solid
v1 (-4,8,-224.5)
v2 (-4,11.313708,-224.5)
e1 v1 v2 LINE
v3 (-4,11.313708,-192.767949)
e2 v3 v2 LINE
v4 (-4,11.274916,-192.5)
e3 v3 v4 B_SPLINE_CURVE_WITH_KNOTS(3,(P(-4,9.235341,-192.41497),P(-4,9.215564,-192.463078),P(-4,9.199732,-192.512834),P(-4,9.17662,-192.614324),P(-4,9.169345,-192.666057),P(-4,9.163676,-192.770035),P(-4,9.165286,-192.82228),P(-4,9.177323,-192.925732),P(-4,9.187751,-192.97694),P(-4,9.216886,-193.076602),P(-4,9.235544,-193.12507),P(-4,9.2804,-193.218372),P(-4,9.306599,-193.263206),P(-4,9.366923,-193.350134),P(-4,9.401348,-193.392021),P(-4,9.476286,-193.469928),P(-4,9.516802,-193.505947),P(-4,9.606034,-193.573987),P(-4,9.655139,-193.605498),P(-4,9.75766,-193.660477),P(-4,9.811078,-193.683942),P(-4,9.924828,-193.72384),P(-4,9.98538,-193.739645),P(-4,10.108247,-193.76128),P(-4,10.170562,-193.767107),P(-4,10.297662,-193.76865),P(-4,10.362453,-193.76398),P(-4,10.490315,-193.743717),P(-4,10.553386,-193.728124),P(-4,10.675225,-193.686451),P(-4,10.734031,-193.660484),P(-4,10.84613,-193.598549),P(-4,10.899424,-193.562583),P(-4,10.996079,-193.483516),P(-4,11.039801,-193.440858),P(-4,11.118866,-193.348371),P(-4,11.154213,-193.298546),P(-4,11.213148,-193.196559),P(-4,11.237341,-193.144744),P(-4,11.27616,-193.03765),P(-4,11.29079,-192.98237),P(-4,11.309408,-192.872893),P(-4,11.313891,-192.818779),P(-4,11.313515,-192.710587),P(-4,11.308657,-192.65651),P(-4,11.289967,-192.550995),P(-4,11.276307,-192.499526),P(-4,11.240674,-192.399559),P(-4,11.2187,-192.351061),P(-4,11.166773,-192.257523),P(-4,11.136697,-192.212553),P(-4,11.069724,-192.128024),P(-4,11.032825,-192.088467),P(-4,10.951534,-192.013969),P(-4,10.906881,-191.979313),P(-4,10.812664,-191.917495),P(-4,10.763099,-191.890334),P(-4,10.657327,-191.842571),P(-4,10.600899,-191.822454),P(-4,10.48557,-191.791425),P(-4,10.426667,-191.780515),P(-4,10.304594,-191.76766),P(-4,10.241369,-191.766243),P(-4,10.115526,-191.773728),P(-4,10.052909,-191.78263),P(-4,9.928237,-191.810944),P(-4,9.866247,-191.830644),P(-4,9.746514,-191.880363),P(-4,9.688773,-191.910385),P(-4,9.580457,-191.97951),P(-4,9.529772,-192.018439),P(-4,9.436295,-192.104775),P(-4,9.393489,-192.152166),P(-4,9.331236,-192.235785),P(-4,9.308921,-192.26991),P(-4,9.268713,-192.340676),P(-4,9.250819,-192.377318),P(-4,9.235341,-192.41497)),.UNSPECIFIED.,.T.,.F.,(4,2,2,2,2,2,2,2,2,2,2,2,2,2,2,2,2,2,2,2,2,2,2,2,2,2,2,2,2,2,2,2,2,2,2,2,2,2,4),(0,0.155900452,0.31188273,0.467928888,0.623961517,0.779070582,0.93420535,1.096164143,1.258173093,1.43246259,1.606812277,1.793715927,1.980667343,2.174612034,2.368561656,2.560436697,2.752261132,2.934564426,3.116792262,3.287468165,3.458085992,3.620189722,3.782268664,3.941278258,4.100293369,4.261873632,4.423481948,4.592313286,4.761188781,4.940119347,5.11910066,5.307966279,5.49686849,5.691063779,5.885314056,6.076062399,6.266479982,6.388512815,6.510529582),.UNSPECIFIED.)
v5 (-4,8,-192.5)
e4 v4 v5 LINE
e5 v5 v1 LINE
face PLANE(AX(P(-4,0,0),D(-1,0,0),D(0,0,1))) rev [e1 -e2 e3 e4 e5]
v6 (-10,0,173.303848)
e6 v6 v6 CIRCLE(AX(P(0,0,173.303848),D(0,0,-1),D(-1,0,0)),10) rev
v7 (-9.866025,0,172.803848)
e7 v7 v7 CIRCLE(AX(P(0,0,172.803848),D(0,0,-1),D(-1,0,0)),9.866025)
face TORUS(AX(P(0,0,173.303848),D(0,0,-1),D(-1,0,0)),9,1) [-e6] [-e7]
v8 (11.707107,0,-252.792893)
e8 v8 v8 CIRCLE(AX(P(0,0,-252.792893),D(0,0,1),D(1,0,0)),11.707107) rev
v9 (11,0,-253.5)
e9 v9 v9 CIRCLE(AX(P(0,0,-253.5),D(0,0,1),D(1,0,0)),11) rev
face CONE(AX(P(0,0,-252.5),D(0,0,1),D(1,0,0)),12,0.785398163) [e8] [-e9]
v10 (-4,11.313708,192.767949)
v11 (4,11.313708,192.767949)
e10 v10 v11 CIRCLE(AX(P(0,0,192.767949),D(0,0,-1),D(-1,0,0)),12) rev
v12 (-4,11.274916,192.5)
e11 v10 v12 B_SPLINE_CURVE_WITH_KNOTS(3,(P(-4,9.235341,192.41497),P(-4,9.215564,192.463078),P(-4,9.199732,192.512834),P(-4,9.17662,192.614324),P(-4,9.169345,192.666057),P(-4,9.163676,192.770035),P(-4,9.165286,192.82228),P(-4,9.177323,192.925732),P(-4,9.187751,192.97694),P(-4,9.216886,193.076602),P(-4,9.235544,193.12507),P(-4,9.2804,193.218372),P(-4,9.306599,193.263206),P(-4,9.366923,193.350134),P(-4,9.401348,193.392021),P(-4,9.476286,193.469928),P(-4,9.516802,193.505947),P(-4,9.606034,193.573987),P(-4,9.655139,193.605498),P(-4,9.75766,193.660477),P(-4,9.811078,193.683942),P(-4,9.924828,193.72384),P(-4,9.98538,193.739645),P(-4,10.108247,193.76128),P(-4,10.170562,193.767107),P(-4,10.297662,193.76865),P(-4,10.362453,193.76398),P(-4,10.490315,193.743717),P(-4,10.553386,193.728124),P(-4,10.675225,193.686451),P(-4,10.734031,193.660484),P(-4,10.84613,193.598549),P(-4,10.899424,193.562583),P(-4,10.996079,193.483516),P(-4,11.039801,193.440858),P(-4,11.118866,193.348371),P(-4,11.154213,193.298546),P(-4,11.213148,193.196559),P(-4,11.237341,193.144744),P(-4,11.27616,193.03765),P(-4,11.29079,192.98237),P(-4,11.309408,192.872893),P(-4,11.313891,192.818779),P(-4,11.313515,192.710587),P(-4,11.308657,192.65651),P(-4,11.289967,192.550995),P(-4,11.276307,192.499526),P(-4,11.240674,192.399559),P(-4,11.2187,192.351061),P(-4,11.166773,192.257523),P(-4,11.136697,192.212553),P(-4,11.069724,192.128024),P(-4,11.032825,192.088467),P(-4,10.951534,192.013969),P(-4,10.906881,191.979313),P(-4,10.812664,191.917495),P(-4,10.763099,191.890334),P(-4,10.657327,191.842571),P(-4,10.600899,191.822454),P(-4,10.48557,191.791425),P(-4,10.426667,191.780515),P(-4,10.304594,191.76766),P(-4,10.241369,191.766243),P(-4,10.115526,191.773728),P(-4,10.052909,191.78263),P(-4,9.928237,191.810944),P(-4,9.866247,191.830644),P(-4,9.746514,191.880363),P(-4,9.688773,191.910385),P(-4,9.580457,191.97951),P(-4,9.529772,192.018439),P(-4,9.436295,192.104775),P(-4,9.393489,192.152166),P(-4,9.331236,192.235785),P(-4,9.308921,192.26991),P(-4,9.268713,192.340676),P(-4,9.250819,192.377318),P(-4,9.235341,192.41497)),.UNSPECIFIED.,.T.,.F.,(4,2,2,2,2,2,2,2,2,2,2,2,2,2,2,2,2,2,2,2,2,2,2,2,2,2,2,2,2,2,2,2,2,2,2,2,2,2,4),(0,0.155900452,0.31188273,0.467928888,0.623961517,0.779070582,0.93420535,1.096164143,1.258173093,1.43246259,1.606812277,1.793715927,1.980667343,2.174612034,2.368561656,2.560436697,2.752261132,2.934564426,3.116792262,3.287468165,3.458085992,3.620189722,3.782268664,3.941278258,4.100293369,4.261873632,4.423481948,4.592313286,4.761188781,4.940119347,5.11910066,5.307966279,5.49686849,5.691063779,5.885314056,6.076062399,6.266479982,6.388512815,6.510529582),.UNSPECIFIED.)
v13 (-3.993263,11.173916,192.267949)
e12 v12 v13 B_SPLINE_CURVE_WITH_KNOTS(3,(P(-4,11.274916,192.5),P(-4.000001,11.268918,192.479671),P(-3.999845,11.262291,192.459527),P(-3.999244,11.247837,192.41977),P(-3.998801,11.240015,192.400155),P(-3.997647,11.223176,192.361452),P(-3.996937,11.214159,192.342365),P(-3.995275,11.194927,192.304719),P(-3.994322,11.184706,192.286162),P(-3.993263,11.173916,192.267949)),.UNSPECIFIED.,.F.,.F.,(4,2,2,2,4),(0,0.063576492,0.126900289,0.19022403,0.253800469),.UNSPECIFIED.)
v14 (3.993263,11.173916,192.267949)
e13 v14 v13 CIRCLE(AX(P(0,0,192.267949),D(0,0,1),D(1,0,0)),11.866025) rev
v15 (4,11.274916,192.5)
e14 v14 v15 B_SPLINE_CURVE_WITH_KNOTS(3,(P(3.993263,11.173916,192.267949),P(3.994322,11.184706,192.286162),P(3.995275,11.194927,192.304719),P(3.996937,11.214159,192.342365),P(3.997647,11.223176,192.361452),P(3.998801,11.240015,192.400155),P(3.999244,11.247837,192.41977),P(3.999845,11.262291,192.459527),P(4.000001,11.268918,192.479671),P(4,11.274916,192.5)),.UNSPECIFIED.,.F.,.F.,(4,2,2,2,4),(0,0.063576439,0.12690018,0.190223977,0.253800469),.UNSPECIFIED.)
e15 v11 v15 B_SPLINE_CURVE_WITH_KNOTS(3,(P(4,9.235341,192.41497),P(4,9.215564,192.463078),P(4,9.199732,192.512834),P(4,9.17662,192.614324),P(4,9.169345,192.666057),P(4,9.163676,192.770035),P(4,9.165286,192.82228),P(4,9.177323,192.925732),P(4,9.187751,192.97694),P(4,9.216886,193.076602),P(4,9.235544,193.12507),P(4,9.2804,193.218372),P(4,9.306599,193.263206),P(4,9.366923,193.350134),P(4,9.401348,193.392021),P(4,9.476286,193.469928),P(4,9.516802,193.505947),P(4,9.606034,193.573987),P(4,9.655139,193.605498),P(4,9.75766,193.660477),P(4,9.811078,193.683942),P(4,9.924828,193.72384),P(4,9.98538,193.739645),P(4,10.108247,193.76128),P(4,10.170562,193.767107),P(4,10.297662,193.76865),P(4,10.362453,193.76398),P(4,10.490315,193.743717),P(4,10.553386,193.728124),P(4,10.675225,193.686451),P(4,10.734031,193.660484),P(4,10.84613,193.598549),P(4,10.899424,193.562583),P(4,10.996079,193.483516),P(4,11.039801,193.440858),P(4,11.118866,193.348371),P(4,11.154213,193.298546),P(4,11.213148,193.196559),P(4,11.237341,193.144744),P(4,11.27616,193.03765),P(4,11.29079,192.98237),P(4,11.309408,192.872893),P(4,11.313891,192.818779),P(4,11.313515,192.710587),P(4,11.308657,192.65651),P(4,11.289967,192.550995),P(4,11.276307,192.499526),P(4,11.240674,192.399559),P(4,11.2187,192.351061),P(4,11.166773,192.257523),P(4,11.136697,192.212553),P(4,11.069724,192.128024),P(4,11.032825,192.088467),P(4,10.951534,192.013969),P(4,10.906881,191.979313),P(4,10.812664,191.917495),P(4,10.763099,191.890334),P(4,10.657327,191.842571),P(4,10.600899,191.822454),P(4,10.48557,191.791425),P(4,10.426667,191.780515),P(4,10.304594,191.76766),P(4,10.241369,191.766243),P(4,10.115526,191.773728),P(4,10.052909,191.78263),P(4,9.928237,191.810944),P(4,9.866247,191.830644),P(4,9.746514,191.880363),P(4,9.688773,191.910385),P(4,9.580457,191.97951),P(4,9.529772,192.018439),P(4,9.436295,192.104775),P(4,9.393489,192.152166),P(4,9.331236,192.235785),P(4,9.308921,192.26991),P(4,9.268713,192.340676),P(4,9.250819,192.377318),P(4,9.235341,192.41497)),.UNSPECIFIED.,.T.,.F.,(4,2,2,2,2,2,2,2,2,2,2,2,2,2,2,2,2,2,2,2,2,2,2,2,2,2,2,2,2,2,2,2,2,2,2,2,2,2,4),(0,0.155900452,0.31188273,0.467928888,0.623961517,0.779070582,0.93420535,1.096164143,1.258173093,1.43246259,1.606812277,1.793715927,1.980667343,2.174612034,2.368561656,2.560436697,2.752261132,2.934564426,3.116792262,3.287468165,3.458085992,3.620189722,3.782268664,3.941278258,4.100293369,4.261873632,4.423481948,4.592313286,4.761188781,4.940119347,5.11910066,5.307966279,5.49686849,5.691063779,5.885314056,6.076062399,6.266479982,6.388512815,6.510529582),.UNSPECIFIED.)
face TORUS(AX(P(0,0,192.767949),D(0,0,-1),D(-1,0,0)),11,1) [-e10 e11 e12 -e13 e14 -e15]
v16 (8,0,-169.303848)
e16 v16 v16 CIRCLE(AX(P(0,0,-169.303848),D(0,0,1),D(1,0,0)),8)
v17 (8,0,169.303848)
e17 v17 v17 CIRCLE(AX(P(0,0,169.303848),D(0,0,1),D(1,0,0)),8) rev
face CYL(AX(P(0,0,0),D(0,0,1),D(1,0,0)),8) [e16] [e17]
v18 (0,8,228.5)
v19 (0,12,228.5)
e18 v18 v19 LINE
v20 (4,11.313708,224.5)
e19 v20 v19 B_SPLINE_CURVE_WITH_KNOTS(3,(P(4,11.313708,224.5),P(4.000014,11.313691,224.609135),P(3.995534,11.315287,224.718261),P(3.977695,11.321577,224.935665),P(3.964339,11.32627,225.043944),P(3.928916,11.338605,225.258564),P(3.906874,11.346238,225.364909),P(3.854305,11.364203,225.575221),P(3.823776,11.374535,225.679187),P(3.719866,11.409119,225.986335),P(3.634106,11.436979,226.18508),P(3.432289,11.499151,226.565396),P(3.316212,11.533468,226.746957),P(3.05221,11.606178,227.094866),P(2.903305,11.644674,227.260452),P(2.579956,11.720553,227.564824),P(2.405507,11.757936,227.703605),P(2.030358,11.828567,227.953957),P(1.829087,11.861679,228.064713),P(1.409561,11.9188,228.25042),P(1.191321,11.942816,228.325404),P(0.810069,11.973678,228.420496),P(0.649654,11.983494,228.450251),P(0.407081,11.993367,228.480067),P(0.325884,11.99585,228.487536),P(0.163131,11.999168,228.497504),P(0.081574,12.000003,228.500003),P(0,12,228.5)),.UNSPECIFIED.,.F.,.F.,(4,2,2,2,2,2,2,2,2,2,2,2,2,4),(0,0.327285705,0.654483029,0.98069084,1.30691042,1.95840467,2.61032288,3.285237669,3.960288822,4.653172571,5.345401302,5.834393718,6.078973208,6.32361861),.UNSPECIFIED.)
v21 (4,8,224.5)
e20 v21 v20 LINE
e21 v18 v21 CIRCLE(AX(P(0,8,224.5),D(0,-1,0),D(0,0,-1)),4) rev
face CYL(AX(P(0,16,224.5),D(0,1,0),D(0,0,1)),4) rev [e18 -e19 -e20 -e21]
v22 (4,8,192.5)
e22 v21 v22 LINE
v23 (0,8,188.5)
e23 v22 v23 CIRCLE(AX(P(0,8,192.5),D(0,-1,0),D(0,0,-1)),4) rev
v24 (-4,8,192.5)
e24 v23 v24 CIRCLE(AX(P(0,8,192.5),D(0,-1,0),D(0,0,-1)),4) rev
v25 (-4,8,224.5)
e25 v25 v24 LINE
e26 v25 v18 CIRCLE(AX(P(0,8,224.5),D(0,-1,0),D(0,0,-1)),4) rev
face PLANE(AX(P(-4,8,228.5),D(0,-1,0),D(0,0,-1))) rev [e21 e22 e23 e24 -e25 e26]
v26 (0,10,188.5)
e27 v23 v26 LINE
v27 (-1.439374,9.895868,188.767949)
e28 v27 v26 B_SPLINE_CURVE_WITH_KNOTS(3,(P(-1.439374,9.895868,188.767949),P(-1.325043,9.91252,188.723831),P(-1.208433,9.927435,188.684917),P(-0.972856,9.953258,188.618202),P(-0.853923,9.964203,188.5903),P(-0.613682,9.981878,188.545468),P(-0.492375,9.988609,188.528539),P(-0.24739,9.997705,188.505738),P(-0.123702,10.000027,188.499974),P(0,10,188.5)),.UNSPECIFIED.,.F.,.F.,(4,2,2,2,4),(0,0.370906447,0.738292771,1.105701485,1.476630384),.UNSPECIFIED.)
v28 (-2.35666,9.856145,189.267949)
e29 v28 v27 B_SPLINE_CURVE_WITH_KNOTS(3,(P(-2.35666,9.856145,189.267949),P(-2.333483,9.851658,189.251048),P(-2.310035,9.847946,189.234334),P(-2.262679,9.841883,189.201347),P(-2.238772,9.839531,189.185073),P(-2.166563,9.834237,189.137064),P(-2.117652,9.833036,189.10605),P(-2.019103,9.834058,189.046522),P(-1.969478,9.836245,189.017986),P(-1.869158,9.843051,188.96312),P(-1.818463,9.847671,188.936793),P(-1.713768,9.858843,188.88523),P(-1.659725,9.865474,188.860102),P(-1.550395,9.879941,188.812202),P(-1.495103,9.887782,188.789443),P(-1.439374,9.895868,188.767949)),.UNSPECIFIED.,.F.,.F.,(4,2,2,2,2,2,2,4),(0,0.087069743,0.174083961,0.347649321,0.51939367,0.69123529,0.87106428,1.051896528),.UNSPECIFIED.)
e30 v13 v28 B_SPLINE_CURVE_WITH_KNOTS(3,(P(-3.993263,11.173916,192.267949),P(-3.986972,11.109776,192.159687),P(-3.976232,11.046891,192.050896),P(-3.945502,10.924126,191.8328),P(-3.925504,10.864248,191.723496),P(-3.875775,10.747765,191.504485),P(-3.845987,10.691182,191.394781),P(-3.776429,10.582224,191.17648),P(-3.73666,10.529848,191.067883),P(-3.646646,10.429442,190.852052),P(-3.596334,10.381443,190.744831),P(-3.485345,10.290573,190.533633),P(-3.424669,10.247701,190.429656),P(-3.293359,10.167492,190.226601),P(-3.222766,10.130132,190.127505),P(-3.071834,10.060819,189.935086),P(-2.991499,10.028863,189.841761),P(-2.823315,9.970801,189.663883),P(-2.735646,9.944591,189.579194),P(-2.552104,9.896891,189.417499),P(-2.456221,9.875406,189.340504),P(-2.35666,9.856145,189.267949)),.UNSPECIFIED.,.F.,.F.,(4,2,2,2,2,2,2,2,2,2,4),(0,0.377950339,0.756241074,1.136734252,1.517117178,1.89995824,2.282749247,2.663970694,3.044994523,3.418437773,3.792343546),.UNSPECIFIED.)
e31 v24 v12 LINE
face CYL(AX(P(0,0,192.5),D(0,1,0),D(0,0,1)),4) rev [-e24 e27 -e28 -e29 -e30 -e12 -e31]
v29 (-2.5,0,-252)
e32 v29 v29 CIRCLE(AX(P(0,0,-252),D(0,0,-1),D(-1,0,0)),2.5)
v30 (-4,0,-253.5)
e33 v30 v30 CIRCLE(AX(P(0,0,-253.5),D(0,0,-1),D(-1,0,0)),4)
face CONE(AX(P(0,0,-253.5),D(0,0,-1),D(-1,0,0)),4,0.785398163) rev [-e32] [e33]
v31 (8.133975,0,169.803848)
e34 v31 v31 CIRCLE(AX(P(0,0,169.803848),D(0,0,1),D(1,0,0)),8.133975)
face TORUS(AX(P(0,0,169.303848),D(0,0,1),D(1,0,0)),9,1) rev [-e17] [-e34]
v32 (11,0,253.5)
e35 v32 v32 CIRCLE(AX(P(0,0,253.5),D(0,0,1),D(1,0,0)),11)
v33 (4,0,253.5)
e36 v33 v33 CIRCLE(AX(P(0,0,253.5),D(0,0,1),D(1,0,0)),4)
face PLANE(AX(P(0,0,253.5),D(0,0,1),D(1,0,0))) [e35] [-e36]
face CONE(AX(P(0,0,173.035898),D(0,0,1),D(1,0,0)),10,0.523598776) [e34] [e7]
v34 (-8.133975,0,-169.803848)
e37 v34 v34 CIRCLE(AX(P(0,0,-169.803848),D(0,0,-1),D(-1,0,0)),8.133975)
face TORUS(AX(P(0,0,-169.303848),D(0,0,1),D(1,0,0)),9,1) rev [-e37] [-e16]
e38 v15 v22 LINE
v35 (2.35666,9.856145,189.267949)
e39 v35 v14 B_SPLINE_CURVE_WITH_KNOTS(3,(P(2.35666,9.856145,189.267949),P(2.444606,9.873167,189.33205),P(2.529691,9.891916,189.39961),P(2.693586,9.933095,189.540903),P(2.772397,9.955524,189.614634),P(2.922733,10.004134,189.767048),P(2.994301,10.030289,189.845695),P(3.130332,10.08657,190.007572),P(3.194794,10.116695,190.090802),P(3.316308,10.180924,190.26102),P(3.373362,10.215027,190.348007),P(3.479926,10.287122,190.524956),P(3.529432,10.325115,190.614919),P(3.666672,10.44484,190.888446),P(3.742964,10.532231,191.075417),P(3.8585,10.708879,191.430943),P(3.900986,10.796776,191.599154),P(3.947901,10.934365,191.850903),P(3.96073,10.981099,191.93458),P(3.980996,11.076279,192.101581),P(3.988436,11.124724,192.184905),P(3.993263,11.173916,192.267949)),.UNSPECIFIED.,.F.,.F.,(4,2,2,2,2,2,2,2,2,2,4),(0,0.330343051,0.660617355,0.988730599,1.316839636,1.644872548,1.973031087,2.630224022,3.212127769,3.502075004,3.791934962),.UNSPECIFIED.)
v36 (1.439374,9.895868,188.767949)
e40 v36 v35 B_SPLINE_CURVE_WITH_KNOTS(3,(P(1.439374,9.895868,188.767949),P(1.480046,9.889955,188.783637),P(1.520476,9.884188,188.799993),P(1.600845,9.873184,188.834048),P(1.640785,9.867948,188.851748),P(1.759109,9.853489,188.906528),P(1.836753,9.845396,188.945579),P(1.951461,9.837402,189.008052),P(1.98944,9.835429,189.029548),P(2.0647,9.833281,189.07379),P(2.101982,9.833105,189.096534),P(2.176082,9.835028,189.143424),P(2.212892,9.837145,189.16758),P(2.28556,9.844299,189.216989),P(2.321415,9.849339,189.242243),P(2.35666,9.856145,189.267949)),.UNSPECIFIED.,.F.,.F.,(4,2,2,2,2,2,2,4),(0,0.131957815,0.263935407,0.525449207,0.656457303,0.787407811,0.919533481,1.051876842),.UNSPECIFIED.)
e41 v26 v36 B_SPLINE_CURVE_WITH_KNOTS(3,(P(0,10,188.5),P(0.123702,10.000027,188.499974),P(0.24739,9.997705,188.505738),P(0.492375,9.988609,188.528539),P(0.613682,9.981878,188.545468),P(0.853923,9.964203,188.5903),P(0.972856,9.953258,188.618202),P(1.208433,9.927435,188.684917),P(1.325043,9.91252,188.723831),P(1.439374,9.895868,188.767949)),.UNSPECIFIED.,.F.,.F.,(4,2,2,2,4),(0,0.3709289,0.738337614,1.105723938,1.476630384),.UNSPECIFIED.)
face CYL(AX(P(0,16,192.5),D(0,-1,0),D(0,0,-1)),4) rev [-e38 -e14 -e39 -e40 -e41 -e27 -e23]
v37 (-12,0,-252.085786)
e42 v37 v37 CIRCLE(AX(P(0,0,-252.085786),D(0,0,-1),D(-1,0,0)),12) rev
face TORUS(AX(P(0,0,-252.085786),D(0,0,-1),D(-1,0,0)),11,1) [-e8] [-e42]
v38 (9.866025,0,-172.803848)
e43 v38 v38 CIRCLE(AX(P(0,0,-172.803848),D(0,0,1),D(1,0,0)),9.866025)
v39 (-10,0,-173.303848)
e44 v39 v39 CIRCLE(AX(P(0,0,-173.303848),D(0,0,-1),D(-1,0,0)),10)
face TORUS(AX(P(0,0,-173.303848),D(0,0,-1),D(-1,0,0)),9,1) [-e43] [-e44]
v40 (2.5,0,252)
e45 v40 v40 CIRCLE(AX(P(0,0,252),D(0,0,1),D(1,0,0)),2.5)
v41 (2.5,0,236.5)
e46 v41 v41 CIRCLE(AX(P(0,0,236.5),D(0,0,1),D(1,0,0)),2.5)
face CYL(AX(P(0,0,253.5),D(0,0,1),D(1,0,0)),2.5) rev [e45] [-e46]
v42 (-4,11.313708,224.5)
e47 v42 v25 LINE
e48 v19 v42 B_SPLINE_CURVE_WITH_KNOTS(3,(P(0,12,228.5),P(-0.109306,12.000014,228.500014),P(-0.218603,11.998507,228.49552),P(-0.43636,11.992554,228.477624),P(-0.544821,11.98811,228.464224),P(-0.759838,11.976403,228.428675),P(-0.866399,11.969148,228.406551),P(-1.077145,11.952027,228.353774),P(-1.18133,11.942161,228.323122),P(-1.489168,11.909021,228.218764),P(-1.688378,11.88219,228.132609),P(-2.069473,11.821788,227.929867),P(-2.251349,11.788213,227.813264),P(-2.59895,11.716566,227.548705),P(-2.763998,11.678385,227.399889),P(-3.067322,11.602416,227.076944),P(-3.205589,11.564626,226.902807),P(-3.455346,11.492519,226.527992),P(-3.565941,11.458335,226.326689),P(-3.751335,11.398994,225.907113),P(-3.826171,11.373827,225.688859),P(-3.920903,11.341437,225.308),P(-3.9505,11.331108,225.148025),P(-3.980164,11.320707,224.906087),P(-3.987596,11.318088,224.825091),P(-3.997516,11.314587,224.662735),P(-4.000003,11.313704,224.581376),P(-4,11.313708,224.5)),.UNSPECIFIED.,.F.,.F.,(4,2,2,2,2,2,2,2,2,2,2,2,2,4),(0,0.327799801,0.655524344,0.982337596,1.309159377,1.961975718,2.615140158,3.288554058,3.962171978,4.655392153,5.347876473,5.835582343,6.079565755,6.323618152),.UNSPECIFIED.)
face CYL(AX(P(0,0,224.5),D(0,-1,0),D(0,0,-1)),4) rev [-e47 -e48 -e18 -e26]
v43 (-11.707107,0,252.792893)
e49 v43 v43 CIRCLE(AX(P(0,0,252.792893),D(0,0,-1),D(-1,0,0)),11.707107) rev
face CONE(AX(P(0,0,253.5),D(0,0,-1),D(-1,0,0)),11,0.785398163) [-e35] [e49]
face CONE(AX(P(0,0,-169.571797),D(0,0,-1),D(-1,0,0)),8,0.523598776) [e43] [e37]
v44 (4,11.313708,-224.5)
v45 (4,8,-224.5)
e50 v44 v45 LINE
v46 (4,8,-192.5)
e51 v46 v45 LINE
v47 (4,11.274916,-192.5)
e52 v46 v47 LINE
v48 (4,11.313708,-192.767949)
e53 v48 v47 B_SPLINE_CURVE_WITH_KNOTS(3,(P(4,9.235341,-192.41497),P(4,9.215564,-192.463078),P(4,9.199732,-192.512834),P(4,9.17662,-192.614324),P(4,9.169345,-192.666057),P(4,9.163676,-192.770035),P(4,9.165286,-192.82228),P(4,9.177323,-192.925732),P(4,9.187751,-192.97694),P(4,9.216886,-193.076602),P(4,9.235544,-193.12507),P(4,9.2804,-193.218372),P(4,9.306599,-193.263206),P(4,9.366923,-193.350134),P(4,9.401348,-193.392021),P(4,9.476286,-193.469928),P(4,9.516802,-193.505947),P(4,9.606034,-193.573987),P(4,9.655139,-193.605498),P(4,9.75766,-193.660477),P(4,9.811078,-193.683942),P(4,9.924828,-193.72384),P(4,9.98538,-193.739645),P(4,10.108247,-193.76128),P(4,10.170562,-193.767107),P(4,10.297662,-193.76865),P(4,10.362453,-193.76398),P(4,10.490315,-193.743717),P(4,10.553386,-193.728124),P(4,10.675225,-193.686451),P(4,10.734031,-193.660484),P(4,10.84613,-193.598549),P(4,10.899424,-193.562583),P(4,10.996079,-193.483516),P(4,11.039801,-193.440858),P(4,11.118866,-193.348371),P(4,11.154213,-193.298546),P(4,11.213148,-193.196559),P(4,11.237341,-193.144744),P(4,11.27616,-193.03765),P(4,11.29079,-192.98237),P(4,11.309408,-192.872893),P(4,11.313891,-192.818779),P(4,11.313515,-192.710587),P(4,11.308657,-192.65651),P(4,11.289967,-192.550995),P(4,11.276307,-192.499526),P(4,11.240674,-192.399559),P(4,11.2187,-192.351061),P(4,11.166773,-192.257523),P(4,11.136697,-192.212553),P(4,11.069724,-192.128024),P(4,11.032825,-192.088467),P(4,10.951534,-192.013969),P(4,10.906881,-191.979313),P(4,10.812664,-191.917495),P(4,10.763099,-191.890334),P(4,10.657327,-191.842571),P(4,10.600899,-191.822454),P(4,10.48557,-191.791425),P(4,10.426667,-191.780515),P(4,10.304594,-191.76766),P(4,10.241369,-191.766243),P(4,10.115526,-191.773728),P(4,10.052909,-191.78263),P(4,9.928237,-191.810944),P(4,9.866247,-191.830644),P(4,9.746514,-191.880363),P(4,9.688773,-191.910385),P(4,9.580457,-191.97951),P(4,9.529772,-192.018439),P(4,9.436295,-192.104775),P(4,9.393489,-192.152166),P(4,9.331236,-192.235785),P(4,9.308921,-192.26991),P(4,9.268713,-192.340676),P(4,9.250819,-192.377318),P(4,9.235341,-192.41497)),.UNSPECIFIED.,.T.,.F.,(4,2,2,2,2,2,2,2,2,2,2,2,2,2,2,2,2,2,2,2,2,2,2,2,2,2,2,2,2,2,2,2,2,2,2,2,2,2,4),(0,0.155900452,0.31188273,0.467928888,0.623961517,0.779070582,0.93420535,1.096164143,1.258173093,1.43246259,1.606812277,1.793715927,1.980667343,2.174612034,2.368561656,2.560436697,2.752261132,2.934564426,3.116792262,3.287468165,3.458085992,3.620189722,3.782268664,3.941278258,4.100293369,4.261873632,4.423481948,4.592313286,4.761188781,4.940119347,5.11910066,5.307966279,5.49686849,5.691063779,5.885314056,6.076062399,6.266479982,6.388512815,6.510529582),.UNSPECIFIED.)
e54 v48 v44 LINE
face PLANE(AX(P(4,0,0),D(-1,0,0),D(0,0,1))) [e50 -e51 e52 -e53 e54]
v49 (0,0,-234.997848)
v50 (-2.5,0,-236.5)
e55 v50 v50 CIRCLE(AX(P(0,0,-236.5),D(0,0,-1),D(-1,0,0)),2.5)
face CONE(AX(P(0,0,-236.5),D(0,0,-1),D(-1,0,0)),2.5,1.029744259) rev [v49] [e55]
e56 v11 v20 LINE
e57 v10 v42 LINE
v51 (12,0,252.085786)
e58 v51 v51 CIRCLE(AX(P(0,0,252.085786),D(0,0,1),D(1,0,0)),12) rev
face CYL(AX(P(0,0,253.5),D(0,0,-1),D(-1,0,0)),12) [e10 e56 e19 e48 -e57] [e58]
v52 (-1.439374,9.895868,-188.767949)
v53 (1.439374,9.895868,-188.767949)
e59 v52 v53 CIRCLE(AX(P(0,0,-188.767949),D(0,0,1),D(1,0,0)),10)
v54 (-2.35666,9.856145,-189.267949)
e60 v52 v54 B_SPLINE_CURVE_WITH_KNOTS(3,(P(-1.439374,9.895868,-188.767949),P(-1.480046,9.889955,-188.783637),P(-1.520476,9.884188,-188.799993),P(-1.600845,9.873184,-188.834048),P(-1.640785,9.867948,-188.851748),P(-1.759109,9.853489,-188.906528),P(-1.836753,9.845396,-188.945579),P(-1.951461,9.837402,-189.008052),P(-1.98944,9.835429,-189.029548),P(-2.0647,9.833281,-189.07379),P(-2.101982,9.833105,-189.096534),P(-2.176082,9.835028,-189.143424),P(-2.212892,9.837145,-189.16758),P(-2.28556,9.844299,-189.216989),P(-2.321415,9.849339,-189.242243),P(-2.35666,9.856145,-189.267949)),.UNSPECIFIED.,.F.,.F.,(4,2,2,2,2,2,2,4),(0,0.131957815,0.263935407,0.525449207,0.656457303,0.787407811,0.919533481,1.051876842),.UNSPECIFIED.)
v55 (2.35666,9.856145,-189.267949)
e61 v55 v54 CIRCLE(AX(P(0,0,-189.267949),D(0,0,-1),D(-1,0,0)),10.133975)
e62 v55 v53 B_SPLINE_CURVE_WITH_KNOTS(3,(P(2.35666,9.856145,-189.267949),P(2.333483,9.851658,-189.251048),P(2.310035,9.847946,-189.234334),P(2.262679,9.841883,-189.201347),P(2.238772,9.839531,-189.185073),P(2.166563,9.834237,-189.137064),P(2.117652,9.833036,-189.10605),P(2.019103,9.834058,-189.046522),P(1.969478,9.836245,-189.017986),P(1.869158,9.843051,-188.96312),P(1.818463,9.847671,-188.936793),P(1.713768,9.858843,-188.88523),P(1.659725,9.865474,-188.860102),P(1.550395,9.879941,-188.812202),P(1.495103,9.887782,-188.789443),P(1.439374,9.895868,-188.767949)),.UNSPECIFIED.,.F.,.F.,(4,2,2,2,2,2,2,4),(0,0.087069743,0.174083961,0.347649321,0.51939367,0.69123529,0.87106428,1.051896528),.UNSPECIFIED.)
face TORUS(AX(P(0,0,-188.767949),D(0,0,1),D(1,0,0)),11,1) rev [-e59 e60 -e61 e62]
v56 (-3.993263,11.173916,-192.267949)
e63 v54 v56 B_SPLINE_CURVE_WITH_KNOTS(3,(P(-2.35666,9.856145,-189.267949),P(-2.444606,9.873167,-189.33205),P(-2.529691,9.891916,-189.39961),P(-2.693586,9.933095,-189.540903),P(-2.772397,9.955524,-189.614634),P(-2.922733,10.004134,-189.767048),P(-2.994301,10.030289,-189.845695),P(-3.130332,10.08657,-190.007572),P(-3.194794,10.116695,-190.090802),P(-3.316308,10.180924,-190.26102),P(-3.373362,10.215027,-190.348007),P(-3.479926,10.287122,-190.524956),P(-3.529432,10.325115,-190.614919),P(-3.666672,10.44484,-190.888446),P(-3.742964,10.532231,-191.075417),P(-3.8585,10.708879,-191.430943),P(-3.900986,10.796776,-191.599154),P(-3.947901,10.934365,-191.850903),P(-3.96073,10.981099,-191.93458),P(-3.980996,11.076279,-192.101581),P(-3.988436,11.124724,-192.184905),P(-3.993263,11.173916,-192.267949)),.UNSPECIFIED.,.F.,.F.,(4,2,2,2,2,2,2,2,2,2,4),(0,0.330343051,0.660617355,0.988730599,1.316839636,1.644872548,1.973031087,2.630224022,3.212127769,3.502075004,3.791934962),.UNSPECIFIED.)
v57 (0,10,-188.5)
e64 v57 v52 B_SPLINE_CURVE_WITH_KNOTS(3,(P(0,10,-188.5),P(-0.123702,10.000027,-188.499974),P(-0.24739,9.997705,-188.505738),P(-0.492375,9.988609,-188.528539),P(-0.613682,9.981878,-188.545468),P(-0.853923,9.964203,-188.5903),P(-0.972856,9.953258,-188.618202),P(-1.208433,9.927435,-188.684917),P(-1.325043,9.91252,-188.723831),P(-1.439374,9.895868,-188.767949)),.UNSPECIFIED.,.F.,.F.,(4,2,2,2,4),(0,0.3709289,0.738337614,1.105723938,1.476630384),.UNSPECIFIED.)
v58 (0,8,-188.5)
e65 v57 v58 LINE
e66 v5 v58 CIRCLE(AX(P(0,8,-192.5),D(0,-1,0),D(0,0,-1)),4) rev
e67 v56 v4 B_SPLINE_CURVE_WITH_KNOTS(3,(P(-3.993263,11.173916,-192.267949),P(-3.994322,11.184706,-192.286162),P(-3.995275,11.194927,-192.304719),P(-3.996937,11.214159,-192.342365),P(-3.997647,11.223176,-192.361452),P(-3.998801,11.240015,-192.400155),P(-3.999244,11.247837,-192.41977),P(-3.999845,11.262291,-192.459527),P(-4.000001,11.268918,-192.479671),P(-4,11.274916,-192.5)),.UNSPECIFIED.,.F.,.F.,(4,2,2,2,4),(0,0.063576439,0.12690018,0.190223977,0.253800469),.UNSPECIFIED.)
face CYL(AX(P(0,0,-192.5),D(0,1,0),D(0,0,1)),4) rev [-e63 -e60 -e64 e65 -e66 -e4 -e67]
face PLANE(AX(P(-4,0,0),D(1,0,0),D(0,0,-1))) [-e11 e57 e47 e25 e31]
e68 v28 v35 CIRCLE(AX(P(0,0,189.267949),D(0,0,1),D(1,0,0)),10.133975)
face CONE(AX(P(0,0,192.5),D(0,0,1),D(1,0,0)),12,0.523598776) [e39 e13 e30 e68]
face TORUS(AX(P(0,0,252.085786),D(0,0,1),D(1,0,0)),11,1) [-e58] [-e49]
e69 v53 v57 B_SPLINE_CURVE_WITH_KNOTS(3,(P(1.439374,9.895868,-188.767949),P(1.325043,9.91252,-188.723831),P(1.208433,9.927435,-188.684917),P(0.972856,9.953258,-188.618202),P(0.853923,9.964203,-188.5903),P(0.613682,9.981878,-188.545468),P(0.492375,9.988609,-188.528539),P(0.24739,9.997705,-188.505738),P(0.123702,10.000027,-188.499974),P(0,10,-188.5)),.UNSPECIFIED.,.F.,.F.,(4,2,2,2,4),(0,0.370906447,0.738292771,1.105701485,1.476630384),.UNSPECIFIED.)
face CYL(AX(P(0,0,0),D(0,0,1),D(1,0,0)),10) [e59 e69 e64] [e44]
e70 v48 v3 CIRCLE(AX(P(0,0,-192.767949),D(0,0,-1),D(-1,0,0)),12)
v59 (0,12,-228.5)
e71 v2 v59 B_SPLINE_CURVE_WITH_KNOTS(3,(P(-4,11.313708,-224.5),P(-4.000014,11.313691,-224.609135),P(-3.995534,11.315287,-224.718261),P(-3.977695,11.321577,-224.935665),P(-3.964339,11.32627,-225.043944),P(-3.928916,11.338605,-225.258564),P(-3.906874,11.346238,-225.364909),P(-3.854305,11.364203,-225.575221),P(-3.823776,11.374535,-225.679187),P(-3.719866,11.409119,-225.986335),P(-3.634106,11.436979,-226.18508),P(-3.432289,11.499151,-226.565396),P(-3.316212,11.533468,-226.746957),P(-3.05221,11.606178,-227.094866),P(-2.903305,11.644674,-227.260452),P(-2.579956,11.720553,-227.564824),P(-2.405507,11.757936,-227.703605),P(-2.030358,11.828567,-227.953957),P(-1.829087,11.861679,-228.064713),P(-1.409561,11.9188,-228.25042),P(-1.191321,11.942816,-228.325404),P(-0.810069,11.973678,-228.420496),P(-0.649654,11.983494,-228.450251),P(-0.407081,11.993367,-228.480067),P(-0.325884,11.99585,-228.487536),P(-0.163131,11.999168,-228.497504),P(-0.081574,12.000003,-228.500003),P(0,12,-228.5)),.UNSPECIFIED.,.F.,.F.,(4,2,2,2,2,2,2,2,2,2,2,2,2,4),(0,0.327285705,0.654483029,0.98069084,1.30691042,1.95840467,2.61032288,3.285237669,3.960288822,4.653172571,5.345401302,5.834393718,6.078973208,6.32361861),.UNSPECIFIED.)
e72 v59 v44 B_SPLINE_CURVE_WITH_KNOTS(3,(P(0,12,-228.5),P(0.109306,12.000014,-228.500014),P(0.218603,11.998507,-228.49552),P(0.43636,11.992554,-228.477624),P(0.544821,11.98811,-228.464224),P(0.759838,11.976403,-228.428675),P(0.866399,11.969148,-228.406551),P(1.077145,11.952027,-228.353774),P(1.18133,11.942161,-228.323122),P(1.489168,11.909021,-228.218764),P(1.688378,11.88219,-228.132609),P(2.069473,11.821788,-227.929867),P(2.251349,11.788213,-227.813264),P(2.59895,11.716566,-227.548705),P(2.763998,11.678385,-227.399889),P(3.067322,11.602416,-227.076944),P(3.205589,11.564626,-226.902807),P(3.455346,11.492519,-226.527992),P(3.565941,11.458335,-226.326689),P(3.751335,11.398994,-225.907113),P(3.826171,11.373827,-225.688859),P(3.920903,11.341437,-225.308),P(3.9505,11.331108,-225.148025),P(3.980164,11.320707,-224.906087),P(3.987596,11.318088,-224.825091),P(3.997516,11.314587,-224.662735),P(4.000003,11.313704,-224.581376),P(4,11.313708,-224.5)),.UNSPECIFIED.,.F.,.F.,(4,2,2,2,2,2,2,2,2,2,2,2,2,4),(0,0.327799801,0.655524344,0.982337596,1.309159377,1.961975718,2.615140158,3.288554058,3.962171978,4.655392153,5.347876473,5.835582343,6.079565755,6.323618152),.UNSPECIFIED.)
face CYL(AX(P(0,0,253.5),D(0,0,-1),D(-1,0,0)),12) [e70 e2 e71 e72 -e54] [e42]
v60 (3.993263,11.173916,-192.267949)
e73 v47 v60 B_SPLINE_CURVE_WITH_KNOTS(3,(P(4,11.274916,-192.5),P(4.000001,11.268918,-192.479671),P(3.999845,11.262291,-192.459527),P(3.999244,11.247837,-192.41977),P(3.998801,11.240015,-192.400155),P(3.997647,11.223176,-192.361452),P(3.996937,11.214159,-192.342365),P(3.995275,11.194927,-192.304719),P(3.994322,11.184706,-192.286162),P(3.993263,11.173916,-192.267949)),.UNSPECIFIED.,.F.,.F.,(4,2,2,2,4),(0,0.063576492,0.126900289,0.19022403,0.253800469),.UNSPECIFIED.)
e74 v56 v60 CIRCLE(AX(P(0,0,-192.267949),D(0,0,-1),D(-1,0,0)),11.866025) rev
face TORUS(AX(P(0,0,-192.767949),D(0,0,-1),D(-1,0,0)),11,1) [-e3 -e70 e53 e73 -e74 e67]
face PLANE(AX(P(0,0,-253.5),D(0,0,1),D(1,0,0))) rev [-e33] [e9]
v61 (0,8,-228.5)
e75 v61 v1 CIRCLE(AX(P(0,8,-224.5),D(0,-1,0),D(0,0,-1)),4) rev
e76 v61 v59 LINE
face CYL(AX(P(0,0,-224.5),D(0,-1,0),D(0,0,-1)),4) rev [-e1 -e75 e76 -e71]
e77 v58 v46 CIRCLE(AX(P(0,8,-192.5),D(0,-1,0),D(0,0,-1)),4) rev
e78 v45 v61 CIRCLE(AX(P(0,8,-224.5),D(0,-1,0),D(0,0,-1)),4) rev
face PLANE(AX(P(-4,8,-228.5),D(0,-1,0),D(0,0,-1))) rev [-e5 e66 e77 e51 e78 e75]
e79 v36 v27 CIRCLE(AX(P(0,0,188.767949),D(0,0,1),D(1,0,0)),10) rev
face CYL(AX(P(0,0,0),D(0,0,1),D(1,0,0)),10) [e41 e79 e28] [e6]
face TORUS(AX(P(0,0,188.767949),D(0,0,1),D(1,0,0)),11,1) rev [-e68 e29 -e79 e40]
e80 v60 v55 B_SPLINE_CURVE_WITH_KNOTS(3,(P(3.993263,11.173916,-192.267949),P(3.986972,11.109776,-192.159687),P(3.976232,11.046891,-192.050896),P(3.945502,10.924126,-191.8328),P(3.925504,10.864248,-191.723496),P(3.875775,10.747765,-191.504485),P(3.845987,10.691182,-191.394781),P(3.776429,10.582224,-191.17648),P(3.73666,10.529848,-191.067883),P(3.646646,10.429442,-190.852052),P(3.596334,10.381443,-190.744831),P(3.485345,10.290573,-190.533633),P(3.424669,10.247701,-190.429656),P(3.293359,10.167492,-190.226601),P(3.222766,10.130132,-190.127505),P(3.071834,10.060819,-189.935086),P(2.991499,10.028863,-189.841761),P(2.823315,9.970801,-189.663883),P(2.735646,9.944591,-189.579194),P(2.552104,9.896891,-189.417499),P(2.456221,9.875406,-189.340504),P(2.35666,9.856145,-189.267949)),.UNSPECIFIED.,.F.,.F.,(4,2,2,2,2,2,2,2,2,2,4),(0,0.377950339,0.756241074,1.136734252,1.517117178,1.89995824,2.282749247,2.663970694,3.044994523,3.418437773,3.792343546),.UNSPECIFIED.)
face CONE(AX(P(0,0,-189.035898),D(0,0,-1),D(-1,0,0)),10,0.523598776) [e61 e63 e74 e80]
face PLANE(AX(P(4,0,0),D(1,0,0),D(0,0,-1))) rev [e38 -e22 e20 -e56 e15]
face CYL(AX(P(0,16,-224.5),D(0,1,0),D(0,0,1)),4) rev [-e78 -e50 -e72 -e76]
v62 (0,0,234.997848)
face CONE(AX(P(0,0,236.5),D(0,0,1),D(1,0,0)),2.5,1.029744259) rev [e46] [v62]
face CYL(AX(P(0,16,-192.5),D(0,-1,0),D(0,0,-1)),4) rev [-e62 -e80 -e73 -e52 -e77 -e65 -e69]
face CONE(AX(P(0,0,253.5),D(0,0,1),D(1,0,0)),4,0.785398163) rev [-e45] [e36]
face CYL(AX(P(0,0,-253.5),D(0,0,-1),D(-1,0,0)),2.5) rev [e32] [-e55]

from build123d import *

# Parameters (mm, degrees)
SKETCH1_R                   = 12
BOSS_EXTRUDE1_DEPTH         = 253.5
CHAMFER1_SIZE               = 1
FILLET1_R                   = 1
SKETCH3_W                   = 40
SKETCH3_H                   = 8
CUT_EXTRUDE1_DEPTH          = 4
FILLET2_R                   = 4
M6_TAPPED_HOLE1_D           = 5
M6_TAPPED_HOLE1_DEPTH       = 17
M6_TAPPED_HOLE1_CSINK_D     = 8
M6_TAPPED_HOLE1_CSINK_ANGLE = 90
M6_TAPPED_HOLE1_TIP         = 1.502151548
M6_TAPPED_HOLE2_D           = 5
M6_TAPPED_HOLE2_DEPTH       = 17
M6_TAPPED_HOLE2_CSINK_D     = 8
M6_TAPPED_HOLE2_CSINK_ANGLE = 90
M6_TAPPED_HOLE2_TIP         = 1.502151548


with BuildPart() as part:
    # Sketch1 → Boss-Extrude1 (new, symmetric)
    with BuildSketch(Plane.XY):
        Circle(SKETCH1_R)
    extrude(amount=BOSS_EXTRUDE1_DEPTH, both=True)

    # Sketch2 → Cut-Revolve1 (revolve, cut)
    with BuildSketch(Plane(origin=(0, 0, 0), x_dir=(1, 0, 0), z_dir=(0, 1, 0)), mode=Mode.PRIVATE) as cut_revolve1_sk:
        Polygon((-10, 173.035898385), (-8, 169.57179677), (-8, -169.57179677), (-10, -173.035898385), (-10, -189.035898385), (-12, -192.5), (-12, -176.5), (-12, 176.5), (-12, 192.5), (-10, 189.035898385), align=None)
    revolve(cut_revolve1_sk.sketch.rotate(Axis((0, 0, 0), (0, 0, -1)), 180), axis=Axis((0, 0, 0), (0, 0, -1)), mode=Mode.SUBTRACT)

    # Chamfer1
    chamfer1_edges = [part.edges().sort_by_distance(p)[0] for p in [
        (-12, 0, -253.5),
        (-12, 0, 253.5),
    ]]
    chamfer(chamfer1_edges, length=CHAMFER1_SIZE)

    # Fillet1
    fillet1_edges = [part.edges().sort_by_distance(p)[0] for p in [
        (-12, 0, 252.5),
        (-12, 0, -252.5),
        (-10, 0, -189.035898385),
        (-10, 0, -173.035898385),
        (-8, 0, -169.57179677),
        (-8, 0, 169.57179677),
        (-10, 0, 173.035898385),
        (-10, 0, 189.035898385),
        (-12, 0, 192.5),
        (-12, 0, -192.5),
    ]]
    fillet(fillet1_edges, radius=FILLET1_R)

    # Sketch3 → Cut-Extrude1 (cut, symmetric)
    with BuildSketch(Plane(origin=(0, 0, 0), x_dir=(0, 0, -1), z_dir=(1, 0, 0))):
        with Locations((208.5, 12)):
            Rectangle(SKETCH3_W, SKETCH3_H)
        with Locations((-208.5, 12)):
            Rectangle(SKETCH3_W, SKETCH3_H)
    extrude(amount=CUT_EXTRUDE1_DEPTH, both=True, mode=Mode.SUBTRACT)

    # Fillet2
    fillet2_edges = [part.edges().sort_by_distance(p)[0] for p in [
        (-4, 8.582575695, 188.5),
        (4, 8.582575695, 188.5),
        (4, 9.656854249, 228.5),
        (-4, 9.656854249, 228.5),
        (-4, 8.582575695, -188.5),
        (4, 8.582575695, -188.5),
        (-4, 9.656854249, -228.5),
        (4, 9.656854249, -228.5),
    ]]
    fillet(fillet2_edges, radius=FILLET2_R - 0.0001)  # a hair under: the kernel refuses the full size

    # M6 Tapped Hole1
    with Locations(Plane(origin=(0, 0, -253.5), x_dir=(-1, 0, 0), z_dir=(0, 0, -1))):
        with Locations((0, 0)):
            CounterSinkHole(M6_TAPPED_HOLE1_D / 2, M6_TAPPED_HOLE1_CSINK_D / 2, depth=M6_TAPPED_HOLE1_DEPTH, counter_sink_angle=M6_TAPPED_HOLE1_CSINK_ANGLE)
            with Locations((0, 0, -(M6_TAPPED_HOLE1_DEPTH + M6_TAPPED_HOLE1_TIP / 2))):  # 118° drill point
                Cone(0, M6_TAPPED_HOLE1_D / 2, M6_TAPPED_HOLE1_TIP, mode=Mode.SUBTRACT)

    # M6 Tapped Hole2
    with Locations(Plane.XY.offset(253.5)):
        with Locations((0, 0)):
            CounterSinkHole(M6_TAPPED_HOLE2_D / 2, M6_TAPPED_HOLE2_CSINK_D / 2, depth=M6_TAPPED_HOLE2_DEPTH, counter_sink_angle=M6_TAPPED_HOLE2_CSINK_ANGLE)
            with Locations((0, 0, -(M6_TAPPED_HOLE2_DEPTH + M6_TAPPED_HOLE2_TIP / 2))):  # 118° drill point
                Cone(0, M6_TAPPED_HOLE2_D / 2, M6_TAPPED_HOLE2_TIP, mode=Mode.SUBTRACT)


solid = part.part
